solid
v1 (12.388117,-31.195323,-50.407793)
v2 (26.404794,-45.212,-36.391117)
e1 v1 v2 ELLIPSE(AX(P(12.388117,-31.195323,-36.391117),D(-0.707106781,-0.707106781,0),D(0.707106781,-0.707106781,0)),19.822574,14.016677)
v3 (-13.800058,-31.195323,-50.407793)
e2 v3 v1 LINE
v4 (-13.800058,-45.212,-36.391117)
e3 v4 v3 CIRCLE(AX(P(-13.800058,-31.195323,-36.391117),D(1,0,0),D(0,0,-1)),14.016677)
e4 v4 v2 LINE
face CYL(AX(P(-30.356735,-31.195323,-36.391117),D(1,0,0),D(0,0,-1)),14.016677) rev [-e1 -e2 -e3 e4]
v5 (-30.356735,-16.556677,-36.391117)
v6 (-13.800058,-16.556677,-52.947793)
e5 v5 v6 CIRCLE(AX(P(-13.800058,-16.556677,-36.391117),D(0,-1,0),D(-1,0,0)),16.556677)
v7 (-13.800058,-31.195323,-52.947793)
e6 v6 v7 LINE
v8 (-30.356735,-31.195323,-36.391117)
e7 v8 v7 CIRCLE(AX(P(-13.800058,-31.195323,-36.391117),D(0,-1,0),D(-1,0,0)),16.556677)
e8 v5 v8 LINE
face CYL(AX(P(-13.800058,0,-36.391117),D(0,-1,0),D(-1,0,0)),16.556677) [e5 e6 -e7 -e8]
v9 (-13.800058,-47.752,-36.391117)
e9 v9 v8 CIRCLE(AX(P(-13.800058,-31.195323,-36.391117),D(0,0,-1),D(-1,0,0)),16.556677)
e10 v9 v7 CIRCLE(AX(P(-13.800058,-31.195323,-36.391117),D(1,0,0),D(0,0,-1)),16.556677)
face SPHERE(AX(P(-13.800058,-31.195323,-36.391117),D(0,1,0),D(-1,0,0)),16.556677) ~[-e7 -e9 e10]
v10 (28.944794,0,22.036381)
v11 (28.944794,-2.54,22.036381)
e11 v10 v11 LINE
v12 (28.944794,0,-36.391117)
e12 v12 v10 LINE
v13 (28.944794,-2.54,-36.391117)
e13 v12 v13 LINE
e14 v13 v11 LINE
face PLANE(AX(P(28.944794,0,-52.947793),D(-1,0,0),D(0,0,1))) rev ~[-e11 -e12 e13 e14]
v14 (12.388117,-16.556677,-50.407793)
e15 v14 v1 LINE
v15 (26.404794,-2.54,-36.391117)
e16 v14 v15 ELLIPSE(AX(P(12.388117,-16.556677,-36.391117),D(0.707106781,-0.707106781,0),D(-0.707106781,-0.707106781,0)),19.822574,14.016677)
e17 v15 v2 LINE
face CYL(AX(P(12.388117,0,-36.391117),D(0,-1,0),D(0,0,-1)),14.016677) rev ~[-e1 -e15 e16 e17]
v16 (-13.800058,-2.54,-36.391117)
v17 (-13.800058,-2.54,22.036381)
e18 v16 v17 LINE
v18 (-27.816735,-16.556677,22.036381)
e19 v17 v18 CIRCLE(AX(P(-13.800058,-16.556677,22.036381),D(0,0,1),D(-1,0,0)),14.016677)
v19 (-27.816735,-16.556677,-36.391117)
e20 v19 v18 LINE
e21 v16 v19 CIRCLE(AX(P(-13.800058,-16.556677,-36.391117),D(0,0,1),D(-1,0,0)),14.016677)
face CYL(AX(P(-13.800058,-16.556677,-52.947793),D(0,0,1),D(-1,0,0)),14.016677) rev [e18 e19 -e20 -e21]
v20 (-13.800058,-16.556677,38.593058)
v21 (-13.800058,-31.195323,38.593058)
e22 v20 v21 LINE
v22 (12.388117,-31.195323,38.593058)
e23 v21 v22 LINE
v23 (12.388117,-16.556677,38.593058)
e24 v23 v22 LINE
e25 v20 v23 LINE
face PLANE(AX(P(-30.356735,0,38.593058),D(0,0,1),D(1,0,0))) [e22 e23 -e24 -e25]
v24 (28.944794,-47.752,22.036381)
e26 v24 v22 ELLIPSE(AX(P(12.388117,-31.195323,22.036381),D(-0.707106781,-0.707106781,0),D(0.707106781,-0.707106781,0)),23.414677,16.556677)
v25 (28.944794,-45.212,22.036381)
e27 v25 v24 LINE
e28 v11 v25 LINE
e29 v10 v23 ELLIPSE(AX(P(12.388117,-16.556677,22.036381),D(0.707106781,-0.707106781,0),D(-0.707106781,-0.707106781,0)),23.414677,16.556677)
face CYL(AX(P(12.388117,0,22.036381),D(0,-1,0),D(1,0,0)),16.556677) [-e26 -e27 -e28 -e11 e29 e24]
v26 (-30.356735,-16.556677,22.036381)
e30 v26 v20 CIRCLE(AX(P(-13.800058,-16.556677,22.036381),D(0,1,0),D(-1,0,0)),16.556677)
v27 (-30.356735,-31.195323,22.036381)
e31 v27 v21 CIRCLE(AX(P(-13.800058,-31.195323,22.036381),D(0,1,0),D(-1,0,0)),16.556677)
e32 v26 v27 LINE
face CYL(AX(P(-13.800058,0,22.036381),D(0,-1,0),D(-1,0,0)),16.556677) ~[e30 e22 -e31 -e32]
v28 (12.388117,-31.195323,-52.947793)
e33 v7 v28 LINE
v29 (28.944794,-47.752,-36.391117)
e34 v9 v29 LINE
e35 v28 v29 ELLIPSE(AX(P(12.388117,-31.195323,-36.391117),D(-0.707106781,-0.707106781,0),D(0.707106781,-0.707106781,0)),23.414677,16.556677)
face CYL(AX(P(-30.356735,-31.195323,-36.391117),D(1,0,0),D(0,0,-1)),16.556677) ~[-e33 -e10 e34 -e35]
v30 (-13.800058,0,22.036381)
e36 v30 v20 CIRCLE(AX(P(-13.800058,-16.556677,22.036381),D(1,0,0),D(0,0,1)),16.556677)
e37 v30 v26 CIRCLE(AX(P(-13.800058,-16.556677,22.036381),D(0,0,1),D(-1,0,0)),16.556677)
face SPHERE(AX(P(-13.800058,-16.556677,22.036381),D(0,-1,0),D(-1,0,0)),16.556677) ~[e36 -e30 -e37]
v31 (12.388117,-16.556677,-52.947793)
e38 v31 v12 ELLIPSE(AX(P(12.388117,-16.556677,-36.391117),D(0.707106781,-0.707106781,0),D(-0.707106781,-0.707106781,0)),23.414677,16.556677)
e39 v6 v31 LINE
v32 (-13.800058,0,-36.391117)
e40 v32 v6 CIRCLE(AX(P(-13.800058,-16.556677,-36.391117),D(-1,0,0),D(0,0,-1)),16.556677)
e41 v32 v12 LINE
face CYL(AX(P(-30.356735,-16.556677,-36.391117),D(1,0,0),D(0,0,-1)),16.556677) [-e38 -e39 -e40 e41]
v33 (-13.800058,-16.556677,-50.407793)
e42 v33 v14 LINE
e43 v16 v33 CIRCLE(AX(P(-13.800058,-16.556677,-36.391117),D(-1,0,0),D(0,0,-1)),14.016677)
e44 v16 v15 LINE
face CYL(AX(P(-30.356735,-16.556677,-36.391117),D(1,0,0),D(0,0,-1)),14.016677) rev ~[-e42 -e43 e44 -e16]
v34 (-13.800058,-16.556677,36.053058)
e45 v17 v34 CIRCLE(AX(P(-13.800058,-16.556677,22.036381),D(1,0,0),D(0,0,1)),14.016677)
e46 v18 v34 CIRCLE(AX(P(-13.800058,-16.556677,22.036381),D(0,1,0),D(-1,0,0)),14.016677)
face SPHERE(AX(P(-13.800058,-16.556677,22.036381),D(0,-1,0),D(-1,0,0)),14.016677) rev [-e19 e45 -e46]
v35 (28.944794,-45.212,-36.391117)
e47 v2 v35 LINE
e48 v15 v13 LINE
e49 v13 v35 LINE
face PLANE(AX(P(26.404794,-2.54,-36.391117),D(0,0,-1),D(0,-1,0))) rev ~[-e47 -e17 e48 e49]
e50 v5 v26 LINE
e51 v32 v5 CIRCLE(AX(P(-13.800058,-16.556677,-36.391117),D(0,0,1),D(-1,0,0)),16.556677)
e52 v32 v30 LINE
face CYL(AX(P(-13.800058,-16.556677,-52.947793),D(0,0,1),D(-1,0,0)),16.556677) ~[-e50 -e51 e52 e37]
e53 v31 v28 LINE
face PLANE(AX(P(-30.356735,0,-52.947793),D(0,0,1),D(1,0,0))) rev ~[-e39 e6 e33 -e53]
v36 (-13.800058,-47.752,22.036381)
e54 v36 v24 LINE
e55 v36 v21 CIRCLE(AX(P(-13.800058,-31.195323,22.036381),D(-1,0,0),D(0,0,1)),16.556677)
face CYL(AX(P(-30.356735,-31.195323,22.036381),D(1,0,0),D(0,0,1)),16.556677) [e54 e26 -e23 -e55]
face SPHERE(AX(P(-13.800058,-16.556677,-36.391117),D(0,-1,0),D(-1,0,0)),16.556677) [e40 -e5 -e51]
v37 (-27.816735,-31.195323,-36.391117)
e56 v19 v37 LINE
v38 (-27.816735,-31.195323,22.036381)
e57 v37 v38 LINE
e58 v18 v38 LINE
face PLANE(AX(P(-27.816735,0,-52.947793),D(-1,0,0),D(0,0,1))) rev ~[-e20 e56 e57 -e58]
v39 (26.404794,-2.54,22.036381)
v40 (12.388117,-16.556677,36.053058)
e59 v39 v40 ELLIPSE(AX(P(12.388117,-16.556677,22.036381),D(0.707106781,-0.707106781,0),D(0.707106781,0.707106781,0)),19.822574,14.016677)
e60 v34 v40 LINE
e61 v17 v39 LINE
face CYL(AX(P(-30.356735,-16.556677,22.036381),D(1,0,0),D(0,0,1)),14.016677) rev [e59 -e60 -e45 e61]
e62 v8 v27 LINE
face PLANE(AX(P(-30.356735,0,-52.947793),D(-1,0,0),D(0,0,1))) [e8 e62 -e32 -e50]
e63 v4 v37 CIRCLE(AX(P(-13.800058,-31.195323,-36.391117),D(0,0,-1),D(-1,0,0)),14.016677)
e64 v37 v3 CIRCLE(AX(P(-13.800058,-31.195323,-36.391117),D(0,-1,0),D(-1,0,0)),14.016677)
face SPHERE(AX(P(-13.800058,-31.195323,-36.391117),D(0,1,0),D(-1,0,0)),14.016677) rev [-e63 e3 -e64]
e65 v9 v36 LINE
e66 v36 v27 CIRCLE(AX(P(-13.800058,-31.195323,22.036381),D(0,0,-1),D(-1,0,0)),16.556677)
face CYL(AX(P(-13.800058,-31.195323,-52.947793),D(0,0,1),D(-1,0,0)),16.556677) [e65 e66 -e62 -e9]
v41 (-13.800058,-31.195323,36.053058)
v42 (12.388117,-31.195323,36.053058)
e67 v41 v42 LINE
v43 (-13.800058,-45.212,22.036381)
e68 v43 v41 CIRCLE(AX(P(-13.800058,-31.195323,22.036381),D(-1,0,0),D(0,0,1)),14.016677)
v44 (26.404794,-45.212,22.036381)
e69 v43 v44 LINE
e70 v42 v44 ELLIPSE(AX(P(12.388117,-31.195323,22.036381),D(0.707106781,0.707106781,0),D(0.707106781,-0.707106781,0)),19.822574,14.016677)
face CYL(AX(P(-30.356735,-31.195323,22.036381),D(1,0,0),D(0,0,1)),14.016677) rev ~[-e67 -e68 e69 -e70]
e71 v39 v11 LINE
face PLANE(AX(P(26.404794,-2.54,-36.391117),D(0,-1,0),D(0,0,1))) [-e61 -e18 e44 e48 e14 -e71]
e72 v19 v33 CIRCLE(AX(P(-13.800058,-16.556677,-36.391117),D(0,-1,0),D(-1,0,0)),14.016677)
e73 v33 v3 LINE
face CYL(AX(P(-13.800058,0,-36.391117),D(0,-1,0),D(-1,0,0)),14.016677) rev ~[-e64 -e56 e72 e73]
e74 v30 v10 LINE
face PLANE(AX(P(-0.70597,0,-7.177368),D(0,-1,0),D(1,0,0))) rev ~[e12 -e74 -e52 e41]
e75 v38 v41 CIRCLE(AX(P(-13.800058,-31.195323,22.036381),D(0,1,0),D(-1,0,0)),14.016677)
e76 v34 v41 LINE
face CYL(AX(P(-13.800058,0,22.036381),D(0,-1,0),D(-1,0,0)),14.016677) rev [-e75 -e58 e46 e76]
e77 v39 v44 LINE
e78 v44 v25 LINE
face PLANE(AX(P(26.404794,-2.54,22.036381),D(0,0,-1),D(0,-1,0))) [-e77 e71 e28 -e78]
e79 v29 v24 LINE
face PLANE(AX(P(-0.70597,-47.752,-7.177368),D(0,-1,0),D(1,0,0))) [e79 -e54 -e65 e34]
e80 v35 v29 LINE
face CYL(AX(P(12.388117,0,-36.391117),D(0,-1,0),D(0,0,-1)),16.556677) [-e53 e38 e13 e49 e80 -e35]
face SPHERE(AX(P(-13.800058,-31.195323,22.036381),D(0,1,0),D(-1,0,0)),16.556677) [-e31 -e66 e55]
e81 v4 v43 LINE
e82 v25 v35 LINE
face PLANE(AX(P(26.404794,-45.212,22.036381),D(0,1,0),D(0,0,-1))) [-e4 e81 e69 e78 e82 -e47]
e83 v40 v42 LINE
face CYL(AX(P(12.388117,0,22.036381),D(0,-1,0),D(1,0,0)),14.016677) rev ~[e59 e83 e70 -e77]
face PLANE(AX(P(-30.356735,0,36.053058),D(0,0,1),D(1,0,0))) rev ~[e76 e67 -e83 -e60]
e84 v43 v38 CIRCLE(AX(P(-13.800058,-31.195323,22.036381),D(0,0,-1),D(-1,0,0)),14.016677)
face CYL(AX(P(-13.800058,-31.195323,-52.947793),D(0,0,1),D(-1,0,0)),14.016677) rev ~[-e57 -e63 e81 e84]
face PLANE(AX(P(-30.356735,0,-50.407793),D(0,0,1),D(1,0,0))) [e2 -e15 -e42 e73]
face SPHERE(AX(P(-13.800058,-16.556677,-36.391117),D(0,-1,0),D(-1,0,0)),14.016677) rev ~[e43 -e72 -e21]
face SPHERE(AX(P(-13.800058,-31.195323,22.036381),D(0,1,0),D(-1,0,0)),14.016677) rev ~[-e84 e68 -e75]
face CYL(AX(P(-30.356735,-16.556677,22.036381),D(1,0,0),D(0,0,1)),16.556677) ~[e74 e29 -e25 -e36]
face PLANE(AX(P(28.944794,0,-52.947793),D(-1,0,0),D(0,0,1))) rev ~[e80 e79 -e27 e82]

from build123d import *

# Parameters (mm, degrees)
F0_W     = 59.3015290797
F0_H     = 91.5408506989
F1_DEPTH = 47.752
F2_R     = 16.5566766108
F3_T     = -2.54


# Not quite as in the source:
# - a shell that OpenCascade refuses in one call is made with other operations: the cavity is built on its own and cut out


with BuildPart() as f1:
    # F0 (on Front) → F1 (new body)
    with BuildSketch(Plane.XZ):
        with Locations((-0.7059704512, -7.1773678064)):
            Rectangle(F0_W, F0_H)
    extrude(amount=F1_DEPTH)

    # F2
    f2_edges = [f1.edges().sort_by_distance(p)[0] for p in [
        (-30.356735, -23.876, 38.593058),
        (-30.356735, -23.876, -52.947793),
        (-30.356735, 0, -7.177368),
        (-30.356735, -47.752, -7.177368),
        (28.944794, -23.876, -52.947793),
        (-0.70597, 0, -52.947793),
        (-0.70597, -47.752, -52.947793),
        (28.944794, -23.876, 38.593058),
        (-0.70597, 0, 38.593058),
        (-0.70597, -47.752, 38.593058),
    ]]
    fillet(f2_edges, radius=F2_R)

    # F3: a shell. OpenCascade refuses it in one call, so the cavity is built on its own and cut out:
    # the body offset inwards by the wall thickness, plus a prism from it out through each open face.
    f3_core = offset(f1.part, amount=F3_T, mode=Mode.PRIVATE)
    f3_exits = [f3_core.faces().sort_by_distance(p)[0] for p in [
        (26.404794, -23.876, -7.177368),
    ]]
    add(f3_core, mode=Mode.SUBTRACT)
    extrude(f3_exits, amount=-F3_T, mode=Mode.SUBTRACT)


solid = f1.part
